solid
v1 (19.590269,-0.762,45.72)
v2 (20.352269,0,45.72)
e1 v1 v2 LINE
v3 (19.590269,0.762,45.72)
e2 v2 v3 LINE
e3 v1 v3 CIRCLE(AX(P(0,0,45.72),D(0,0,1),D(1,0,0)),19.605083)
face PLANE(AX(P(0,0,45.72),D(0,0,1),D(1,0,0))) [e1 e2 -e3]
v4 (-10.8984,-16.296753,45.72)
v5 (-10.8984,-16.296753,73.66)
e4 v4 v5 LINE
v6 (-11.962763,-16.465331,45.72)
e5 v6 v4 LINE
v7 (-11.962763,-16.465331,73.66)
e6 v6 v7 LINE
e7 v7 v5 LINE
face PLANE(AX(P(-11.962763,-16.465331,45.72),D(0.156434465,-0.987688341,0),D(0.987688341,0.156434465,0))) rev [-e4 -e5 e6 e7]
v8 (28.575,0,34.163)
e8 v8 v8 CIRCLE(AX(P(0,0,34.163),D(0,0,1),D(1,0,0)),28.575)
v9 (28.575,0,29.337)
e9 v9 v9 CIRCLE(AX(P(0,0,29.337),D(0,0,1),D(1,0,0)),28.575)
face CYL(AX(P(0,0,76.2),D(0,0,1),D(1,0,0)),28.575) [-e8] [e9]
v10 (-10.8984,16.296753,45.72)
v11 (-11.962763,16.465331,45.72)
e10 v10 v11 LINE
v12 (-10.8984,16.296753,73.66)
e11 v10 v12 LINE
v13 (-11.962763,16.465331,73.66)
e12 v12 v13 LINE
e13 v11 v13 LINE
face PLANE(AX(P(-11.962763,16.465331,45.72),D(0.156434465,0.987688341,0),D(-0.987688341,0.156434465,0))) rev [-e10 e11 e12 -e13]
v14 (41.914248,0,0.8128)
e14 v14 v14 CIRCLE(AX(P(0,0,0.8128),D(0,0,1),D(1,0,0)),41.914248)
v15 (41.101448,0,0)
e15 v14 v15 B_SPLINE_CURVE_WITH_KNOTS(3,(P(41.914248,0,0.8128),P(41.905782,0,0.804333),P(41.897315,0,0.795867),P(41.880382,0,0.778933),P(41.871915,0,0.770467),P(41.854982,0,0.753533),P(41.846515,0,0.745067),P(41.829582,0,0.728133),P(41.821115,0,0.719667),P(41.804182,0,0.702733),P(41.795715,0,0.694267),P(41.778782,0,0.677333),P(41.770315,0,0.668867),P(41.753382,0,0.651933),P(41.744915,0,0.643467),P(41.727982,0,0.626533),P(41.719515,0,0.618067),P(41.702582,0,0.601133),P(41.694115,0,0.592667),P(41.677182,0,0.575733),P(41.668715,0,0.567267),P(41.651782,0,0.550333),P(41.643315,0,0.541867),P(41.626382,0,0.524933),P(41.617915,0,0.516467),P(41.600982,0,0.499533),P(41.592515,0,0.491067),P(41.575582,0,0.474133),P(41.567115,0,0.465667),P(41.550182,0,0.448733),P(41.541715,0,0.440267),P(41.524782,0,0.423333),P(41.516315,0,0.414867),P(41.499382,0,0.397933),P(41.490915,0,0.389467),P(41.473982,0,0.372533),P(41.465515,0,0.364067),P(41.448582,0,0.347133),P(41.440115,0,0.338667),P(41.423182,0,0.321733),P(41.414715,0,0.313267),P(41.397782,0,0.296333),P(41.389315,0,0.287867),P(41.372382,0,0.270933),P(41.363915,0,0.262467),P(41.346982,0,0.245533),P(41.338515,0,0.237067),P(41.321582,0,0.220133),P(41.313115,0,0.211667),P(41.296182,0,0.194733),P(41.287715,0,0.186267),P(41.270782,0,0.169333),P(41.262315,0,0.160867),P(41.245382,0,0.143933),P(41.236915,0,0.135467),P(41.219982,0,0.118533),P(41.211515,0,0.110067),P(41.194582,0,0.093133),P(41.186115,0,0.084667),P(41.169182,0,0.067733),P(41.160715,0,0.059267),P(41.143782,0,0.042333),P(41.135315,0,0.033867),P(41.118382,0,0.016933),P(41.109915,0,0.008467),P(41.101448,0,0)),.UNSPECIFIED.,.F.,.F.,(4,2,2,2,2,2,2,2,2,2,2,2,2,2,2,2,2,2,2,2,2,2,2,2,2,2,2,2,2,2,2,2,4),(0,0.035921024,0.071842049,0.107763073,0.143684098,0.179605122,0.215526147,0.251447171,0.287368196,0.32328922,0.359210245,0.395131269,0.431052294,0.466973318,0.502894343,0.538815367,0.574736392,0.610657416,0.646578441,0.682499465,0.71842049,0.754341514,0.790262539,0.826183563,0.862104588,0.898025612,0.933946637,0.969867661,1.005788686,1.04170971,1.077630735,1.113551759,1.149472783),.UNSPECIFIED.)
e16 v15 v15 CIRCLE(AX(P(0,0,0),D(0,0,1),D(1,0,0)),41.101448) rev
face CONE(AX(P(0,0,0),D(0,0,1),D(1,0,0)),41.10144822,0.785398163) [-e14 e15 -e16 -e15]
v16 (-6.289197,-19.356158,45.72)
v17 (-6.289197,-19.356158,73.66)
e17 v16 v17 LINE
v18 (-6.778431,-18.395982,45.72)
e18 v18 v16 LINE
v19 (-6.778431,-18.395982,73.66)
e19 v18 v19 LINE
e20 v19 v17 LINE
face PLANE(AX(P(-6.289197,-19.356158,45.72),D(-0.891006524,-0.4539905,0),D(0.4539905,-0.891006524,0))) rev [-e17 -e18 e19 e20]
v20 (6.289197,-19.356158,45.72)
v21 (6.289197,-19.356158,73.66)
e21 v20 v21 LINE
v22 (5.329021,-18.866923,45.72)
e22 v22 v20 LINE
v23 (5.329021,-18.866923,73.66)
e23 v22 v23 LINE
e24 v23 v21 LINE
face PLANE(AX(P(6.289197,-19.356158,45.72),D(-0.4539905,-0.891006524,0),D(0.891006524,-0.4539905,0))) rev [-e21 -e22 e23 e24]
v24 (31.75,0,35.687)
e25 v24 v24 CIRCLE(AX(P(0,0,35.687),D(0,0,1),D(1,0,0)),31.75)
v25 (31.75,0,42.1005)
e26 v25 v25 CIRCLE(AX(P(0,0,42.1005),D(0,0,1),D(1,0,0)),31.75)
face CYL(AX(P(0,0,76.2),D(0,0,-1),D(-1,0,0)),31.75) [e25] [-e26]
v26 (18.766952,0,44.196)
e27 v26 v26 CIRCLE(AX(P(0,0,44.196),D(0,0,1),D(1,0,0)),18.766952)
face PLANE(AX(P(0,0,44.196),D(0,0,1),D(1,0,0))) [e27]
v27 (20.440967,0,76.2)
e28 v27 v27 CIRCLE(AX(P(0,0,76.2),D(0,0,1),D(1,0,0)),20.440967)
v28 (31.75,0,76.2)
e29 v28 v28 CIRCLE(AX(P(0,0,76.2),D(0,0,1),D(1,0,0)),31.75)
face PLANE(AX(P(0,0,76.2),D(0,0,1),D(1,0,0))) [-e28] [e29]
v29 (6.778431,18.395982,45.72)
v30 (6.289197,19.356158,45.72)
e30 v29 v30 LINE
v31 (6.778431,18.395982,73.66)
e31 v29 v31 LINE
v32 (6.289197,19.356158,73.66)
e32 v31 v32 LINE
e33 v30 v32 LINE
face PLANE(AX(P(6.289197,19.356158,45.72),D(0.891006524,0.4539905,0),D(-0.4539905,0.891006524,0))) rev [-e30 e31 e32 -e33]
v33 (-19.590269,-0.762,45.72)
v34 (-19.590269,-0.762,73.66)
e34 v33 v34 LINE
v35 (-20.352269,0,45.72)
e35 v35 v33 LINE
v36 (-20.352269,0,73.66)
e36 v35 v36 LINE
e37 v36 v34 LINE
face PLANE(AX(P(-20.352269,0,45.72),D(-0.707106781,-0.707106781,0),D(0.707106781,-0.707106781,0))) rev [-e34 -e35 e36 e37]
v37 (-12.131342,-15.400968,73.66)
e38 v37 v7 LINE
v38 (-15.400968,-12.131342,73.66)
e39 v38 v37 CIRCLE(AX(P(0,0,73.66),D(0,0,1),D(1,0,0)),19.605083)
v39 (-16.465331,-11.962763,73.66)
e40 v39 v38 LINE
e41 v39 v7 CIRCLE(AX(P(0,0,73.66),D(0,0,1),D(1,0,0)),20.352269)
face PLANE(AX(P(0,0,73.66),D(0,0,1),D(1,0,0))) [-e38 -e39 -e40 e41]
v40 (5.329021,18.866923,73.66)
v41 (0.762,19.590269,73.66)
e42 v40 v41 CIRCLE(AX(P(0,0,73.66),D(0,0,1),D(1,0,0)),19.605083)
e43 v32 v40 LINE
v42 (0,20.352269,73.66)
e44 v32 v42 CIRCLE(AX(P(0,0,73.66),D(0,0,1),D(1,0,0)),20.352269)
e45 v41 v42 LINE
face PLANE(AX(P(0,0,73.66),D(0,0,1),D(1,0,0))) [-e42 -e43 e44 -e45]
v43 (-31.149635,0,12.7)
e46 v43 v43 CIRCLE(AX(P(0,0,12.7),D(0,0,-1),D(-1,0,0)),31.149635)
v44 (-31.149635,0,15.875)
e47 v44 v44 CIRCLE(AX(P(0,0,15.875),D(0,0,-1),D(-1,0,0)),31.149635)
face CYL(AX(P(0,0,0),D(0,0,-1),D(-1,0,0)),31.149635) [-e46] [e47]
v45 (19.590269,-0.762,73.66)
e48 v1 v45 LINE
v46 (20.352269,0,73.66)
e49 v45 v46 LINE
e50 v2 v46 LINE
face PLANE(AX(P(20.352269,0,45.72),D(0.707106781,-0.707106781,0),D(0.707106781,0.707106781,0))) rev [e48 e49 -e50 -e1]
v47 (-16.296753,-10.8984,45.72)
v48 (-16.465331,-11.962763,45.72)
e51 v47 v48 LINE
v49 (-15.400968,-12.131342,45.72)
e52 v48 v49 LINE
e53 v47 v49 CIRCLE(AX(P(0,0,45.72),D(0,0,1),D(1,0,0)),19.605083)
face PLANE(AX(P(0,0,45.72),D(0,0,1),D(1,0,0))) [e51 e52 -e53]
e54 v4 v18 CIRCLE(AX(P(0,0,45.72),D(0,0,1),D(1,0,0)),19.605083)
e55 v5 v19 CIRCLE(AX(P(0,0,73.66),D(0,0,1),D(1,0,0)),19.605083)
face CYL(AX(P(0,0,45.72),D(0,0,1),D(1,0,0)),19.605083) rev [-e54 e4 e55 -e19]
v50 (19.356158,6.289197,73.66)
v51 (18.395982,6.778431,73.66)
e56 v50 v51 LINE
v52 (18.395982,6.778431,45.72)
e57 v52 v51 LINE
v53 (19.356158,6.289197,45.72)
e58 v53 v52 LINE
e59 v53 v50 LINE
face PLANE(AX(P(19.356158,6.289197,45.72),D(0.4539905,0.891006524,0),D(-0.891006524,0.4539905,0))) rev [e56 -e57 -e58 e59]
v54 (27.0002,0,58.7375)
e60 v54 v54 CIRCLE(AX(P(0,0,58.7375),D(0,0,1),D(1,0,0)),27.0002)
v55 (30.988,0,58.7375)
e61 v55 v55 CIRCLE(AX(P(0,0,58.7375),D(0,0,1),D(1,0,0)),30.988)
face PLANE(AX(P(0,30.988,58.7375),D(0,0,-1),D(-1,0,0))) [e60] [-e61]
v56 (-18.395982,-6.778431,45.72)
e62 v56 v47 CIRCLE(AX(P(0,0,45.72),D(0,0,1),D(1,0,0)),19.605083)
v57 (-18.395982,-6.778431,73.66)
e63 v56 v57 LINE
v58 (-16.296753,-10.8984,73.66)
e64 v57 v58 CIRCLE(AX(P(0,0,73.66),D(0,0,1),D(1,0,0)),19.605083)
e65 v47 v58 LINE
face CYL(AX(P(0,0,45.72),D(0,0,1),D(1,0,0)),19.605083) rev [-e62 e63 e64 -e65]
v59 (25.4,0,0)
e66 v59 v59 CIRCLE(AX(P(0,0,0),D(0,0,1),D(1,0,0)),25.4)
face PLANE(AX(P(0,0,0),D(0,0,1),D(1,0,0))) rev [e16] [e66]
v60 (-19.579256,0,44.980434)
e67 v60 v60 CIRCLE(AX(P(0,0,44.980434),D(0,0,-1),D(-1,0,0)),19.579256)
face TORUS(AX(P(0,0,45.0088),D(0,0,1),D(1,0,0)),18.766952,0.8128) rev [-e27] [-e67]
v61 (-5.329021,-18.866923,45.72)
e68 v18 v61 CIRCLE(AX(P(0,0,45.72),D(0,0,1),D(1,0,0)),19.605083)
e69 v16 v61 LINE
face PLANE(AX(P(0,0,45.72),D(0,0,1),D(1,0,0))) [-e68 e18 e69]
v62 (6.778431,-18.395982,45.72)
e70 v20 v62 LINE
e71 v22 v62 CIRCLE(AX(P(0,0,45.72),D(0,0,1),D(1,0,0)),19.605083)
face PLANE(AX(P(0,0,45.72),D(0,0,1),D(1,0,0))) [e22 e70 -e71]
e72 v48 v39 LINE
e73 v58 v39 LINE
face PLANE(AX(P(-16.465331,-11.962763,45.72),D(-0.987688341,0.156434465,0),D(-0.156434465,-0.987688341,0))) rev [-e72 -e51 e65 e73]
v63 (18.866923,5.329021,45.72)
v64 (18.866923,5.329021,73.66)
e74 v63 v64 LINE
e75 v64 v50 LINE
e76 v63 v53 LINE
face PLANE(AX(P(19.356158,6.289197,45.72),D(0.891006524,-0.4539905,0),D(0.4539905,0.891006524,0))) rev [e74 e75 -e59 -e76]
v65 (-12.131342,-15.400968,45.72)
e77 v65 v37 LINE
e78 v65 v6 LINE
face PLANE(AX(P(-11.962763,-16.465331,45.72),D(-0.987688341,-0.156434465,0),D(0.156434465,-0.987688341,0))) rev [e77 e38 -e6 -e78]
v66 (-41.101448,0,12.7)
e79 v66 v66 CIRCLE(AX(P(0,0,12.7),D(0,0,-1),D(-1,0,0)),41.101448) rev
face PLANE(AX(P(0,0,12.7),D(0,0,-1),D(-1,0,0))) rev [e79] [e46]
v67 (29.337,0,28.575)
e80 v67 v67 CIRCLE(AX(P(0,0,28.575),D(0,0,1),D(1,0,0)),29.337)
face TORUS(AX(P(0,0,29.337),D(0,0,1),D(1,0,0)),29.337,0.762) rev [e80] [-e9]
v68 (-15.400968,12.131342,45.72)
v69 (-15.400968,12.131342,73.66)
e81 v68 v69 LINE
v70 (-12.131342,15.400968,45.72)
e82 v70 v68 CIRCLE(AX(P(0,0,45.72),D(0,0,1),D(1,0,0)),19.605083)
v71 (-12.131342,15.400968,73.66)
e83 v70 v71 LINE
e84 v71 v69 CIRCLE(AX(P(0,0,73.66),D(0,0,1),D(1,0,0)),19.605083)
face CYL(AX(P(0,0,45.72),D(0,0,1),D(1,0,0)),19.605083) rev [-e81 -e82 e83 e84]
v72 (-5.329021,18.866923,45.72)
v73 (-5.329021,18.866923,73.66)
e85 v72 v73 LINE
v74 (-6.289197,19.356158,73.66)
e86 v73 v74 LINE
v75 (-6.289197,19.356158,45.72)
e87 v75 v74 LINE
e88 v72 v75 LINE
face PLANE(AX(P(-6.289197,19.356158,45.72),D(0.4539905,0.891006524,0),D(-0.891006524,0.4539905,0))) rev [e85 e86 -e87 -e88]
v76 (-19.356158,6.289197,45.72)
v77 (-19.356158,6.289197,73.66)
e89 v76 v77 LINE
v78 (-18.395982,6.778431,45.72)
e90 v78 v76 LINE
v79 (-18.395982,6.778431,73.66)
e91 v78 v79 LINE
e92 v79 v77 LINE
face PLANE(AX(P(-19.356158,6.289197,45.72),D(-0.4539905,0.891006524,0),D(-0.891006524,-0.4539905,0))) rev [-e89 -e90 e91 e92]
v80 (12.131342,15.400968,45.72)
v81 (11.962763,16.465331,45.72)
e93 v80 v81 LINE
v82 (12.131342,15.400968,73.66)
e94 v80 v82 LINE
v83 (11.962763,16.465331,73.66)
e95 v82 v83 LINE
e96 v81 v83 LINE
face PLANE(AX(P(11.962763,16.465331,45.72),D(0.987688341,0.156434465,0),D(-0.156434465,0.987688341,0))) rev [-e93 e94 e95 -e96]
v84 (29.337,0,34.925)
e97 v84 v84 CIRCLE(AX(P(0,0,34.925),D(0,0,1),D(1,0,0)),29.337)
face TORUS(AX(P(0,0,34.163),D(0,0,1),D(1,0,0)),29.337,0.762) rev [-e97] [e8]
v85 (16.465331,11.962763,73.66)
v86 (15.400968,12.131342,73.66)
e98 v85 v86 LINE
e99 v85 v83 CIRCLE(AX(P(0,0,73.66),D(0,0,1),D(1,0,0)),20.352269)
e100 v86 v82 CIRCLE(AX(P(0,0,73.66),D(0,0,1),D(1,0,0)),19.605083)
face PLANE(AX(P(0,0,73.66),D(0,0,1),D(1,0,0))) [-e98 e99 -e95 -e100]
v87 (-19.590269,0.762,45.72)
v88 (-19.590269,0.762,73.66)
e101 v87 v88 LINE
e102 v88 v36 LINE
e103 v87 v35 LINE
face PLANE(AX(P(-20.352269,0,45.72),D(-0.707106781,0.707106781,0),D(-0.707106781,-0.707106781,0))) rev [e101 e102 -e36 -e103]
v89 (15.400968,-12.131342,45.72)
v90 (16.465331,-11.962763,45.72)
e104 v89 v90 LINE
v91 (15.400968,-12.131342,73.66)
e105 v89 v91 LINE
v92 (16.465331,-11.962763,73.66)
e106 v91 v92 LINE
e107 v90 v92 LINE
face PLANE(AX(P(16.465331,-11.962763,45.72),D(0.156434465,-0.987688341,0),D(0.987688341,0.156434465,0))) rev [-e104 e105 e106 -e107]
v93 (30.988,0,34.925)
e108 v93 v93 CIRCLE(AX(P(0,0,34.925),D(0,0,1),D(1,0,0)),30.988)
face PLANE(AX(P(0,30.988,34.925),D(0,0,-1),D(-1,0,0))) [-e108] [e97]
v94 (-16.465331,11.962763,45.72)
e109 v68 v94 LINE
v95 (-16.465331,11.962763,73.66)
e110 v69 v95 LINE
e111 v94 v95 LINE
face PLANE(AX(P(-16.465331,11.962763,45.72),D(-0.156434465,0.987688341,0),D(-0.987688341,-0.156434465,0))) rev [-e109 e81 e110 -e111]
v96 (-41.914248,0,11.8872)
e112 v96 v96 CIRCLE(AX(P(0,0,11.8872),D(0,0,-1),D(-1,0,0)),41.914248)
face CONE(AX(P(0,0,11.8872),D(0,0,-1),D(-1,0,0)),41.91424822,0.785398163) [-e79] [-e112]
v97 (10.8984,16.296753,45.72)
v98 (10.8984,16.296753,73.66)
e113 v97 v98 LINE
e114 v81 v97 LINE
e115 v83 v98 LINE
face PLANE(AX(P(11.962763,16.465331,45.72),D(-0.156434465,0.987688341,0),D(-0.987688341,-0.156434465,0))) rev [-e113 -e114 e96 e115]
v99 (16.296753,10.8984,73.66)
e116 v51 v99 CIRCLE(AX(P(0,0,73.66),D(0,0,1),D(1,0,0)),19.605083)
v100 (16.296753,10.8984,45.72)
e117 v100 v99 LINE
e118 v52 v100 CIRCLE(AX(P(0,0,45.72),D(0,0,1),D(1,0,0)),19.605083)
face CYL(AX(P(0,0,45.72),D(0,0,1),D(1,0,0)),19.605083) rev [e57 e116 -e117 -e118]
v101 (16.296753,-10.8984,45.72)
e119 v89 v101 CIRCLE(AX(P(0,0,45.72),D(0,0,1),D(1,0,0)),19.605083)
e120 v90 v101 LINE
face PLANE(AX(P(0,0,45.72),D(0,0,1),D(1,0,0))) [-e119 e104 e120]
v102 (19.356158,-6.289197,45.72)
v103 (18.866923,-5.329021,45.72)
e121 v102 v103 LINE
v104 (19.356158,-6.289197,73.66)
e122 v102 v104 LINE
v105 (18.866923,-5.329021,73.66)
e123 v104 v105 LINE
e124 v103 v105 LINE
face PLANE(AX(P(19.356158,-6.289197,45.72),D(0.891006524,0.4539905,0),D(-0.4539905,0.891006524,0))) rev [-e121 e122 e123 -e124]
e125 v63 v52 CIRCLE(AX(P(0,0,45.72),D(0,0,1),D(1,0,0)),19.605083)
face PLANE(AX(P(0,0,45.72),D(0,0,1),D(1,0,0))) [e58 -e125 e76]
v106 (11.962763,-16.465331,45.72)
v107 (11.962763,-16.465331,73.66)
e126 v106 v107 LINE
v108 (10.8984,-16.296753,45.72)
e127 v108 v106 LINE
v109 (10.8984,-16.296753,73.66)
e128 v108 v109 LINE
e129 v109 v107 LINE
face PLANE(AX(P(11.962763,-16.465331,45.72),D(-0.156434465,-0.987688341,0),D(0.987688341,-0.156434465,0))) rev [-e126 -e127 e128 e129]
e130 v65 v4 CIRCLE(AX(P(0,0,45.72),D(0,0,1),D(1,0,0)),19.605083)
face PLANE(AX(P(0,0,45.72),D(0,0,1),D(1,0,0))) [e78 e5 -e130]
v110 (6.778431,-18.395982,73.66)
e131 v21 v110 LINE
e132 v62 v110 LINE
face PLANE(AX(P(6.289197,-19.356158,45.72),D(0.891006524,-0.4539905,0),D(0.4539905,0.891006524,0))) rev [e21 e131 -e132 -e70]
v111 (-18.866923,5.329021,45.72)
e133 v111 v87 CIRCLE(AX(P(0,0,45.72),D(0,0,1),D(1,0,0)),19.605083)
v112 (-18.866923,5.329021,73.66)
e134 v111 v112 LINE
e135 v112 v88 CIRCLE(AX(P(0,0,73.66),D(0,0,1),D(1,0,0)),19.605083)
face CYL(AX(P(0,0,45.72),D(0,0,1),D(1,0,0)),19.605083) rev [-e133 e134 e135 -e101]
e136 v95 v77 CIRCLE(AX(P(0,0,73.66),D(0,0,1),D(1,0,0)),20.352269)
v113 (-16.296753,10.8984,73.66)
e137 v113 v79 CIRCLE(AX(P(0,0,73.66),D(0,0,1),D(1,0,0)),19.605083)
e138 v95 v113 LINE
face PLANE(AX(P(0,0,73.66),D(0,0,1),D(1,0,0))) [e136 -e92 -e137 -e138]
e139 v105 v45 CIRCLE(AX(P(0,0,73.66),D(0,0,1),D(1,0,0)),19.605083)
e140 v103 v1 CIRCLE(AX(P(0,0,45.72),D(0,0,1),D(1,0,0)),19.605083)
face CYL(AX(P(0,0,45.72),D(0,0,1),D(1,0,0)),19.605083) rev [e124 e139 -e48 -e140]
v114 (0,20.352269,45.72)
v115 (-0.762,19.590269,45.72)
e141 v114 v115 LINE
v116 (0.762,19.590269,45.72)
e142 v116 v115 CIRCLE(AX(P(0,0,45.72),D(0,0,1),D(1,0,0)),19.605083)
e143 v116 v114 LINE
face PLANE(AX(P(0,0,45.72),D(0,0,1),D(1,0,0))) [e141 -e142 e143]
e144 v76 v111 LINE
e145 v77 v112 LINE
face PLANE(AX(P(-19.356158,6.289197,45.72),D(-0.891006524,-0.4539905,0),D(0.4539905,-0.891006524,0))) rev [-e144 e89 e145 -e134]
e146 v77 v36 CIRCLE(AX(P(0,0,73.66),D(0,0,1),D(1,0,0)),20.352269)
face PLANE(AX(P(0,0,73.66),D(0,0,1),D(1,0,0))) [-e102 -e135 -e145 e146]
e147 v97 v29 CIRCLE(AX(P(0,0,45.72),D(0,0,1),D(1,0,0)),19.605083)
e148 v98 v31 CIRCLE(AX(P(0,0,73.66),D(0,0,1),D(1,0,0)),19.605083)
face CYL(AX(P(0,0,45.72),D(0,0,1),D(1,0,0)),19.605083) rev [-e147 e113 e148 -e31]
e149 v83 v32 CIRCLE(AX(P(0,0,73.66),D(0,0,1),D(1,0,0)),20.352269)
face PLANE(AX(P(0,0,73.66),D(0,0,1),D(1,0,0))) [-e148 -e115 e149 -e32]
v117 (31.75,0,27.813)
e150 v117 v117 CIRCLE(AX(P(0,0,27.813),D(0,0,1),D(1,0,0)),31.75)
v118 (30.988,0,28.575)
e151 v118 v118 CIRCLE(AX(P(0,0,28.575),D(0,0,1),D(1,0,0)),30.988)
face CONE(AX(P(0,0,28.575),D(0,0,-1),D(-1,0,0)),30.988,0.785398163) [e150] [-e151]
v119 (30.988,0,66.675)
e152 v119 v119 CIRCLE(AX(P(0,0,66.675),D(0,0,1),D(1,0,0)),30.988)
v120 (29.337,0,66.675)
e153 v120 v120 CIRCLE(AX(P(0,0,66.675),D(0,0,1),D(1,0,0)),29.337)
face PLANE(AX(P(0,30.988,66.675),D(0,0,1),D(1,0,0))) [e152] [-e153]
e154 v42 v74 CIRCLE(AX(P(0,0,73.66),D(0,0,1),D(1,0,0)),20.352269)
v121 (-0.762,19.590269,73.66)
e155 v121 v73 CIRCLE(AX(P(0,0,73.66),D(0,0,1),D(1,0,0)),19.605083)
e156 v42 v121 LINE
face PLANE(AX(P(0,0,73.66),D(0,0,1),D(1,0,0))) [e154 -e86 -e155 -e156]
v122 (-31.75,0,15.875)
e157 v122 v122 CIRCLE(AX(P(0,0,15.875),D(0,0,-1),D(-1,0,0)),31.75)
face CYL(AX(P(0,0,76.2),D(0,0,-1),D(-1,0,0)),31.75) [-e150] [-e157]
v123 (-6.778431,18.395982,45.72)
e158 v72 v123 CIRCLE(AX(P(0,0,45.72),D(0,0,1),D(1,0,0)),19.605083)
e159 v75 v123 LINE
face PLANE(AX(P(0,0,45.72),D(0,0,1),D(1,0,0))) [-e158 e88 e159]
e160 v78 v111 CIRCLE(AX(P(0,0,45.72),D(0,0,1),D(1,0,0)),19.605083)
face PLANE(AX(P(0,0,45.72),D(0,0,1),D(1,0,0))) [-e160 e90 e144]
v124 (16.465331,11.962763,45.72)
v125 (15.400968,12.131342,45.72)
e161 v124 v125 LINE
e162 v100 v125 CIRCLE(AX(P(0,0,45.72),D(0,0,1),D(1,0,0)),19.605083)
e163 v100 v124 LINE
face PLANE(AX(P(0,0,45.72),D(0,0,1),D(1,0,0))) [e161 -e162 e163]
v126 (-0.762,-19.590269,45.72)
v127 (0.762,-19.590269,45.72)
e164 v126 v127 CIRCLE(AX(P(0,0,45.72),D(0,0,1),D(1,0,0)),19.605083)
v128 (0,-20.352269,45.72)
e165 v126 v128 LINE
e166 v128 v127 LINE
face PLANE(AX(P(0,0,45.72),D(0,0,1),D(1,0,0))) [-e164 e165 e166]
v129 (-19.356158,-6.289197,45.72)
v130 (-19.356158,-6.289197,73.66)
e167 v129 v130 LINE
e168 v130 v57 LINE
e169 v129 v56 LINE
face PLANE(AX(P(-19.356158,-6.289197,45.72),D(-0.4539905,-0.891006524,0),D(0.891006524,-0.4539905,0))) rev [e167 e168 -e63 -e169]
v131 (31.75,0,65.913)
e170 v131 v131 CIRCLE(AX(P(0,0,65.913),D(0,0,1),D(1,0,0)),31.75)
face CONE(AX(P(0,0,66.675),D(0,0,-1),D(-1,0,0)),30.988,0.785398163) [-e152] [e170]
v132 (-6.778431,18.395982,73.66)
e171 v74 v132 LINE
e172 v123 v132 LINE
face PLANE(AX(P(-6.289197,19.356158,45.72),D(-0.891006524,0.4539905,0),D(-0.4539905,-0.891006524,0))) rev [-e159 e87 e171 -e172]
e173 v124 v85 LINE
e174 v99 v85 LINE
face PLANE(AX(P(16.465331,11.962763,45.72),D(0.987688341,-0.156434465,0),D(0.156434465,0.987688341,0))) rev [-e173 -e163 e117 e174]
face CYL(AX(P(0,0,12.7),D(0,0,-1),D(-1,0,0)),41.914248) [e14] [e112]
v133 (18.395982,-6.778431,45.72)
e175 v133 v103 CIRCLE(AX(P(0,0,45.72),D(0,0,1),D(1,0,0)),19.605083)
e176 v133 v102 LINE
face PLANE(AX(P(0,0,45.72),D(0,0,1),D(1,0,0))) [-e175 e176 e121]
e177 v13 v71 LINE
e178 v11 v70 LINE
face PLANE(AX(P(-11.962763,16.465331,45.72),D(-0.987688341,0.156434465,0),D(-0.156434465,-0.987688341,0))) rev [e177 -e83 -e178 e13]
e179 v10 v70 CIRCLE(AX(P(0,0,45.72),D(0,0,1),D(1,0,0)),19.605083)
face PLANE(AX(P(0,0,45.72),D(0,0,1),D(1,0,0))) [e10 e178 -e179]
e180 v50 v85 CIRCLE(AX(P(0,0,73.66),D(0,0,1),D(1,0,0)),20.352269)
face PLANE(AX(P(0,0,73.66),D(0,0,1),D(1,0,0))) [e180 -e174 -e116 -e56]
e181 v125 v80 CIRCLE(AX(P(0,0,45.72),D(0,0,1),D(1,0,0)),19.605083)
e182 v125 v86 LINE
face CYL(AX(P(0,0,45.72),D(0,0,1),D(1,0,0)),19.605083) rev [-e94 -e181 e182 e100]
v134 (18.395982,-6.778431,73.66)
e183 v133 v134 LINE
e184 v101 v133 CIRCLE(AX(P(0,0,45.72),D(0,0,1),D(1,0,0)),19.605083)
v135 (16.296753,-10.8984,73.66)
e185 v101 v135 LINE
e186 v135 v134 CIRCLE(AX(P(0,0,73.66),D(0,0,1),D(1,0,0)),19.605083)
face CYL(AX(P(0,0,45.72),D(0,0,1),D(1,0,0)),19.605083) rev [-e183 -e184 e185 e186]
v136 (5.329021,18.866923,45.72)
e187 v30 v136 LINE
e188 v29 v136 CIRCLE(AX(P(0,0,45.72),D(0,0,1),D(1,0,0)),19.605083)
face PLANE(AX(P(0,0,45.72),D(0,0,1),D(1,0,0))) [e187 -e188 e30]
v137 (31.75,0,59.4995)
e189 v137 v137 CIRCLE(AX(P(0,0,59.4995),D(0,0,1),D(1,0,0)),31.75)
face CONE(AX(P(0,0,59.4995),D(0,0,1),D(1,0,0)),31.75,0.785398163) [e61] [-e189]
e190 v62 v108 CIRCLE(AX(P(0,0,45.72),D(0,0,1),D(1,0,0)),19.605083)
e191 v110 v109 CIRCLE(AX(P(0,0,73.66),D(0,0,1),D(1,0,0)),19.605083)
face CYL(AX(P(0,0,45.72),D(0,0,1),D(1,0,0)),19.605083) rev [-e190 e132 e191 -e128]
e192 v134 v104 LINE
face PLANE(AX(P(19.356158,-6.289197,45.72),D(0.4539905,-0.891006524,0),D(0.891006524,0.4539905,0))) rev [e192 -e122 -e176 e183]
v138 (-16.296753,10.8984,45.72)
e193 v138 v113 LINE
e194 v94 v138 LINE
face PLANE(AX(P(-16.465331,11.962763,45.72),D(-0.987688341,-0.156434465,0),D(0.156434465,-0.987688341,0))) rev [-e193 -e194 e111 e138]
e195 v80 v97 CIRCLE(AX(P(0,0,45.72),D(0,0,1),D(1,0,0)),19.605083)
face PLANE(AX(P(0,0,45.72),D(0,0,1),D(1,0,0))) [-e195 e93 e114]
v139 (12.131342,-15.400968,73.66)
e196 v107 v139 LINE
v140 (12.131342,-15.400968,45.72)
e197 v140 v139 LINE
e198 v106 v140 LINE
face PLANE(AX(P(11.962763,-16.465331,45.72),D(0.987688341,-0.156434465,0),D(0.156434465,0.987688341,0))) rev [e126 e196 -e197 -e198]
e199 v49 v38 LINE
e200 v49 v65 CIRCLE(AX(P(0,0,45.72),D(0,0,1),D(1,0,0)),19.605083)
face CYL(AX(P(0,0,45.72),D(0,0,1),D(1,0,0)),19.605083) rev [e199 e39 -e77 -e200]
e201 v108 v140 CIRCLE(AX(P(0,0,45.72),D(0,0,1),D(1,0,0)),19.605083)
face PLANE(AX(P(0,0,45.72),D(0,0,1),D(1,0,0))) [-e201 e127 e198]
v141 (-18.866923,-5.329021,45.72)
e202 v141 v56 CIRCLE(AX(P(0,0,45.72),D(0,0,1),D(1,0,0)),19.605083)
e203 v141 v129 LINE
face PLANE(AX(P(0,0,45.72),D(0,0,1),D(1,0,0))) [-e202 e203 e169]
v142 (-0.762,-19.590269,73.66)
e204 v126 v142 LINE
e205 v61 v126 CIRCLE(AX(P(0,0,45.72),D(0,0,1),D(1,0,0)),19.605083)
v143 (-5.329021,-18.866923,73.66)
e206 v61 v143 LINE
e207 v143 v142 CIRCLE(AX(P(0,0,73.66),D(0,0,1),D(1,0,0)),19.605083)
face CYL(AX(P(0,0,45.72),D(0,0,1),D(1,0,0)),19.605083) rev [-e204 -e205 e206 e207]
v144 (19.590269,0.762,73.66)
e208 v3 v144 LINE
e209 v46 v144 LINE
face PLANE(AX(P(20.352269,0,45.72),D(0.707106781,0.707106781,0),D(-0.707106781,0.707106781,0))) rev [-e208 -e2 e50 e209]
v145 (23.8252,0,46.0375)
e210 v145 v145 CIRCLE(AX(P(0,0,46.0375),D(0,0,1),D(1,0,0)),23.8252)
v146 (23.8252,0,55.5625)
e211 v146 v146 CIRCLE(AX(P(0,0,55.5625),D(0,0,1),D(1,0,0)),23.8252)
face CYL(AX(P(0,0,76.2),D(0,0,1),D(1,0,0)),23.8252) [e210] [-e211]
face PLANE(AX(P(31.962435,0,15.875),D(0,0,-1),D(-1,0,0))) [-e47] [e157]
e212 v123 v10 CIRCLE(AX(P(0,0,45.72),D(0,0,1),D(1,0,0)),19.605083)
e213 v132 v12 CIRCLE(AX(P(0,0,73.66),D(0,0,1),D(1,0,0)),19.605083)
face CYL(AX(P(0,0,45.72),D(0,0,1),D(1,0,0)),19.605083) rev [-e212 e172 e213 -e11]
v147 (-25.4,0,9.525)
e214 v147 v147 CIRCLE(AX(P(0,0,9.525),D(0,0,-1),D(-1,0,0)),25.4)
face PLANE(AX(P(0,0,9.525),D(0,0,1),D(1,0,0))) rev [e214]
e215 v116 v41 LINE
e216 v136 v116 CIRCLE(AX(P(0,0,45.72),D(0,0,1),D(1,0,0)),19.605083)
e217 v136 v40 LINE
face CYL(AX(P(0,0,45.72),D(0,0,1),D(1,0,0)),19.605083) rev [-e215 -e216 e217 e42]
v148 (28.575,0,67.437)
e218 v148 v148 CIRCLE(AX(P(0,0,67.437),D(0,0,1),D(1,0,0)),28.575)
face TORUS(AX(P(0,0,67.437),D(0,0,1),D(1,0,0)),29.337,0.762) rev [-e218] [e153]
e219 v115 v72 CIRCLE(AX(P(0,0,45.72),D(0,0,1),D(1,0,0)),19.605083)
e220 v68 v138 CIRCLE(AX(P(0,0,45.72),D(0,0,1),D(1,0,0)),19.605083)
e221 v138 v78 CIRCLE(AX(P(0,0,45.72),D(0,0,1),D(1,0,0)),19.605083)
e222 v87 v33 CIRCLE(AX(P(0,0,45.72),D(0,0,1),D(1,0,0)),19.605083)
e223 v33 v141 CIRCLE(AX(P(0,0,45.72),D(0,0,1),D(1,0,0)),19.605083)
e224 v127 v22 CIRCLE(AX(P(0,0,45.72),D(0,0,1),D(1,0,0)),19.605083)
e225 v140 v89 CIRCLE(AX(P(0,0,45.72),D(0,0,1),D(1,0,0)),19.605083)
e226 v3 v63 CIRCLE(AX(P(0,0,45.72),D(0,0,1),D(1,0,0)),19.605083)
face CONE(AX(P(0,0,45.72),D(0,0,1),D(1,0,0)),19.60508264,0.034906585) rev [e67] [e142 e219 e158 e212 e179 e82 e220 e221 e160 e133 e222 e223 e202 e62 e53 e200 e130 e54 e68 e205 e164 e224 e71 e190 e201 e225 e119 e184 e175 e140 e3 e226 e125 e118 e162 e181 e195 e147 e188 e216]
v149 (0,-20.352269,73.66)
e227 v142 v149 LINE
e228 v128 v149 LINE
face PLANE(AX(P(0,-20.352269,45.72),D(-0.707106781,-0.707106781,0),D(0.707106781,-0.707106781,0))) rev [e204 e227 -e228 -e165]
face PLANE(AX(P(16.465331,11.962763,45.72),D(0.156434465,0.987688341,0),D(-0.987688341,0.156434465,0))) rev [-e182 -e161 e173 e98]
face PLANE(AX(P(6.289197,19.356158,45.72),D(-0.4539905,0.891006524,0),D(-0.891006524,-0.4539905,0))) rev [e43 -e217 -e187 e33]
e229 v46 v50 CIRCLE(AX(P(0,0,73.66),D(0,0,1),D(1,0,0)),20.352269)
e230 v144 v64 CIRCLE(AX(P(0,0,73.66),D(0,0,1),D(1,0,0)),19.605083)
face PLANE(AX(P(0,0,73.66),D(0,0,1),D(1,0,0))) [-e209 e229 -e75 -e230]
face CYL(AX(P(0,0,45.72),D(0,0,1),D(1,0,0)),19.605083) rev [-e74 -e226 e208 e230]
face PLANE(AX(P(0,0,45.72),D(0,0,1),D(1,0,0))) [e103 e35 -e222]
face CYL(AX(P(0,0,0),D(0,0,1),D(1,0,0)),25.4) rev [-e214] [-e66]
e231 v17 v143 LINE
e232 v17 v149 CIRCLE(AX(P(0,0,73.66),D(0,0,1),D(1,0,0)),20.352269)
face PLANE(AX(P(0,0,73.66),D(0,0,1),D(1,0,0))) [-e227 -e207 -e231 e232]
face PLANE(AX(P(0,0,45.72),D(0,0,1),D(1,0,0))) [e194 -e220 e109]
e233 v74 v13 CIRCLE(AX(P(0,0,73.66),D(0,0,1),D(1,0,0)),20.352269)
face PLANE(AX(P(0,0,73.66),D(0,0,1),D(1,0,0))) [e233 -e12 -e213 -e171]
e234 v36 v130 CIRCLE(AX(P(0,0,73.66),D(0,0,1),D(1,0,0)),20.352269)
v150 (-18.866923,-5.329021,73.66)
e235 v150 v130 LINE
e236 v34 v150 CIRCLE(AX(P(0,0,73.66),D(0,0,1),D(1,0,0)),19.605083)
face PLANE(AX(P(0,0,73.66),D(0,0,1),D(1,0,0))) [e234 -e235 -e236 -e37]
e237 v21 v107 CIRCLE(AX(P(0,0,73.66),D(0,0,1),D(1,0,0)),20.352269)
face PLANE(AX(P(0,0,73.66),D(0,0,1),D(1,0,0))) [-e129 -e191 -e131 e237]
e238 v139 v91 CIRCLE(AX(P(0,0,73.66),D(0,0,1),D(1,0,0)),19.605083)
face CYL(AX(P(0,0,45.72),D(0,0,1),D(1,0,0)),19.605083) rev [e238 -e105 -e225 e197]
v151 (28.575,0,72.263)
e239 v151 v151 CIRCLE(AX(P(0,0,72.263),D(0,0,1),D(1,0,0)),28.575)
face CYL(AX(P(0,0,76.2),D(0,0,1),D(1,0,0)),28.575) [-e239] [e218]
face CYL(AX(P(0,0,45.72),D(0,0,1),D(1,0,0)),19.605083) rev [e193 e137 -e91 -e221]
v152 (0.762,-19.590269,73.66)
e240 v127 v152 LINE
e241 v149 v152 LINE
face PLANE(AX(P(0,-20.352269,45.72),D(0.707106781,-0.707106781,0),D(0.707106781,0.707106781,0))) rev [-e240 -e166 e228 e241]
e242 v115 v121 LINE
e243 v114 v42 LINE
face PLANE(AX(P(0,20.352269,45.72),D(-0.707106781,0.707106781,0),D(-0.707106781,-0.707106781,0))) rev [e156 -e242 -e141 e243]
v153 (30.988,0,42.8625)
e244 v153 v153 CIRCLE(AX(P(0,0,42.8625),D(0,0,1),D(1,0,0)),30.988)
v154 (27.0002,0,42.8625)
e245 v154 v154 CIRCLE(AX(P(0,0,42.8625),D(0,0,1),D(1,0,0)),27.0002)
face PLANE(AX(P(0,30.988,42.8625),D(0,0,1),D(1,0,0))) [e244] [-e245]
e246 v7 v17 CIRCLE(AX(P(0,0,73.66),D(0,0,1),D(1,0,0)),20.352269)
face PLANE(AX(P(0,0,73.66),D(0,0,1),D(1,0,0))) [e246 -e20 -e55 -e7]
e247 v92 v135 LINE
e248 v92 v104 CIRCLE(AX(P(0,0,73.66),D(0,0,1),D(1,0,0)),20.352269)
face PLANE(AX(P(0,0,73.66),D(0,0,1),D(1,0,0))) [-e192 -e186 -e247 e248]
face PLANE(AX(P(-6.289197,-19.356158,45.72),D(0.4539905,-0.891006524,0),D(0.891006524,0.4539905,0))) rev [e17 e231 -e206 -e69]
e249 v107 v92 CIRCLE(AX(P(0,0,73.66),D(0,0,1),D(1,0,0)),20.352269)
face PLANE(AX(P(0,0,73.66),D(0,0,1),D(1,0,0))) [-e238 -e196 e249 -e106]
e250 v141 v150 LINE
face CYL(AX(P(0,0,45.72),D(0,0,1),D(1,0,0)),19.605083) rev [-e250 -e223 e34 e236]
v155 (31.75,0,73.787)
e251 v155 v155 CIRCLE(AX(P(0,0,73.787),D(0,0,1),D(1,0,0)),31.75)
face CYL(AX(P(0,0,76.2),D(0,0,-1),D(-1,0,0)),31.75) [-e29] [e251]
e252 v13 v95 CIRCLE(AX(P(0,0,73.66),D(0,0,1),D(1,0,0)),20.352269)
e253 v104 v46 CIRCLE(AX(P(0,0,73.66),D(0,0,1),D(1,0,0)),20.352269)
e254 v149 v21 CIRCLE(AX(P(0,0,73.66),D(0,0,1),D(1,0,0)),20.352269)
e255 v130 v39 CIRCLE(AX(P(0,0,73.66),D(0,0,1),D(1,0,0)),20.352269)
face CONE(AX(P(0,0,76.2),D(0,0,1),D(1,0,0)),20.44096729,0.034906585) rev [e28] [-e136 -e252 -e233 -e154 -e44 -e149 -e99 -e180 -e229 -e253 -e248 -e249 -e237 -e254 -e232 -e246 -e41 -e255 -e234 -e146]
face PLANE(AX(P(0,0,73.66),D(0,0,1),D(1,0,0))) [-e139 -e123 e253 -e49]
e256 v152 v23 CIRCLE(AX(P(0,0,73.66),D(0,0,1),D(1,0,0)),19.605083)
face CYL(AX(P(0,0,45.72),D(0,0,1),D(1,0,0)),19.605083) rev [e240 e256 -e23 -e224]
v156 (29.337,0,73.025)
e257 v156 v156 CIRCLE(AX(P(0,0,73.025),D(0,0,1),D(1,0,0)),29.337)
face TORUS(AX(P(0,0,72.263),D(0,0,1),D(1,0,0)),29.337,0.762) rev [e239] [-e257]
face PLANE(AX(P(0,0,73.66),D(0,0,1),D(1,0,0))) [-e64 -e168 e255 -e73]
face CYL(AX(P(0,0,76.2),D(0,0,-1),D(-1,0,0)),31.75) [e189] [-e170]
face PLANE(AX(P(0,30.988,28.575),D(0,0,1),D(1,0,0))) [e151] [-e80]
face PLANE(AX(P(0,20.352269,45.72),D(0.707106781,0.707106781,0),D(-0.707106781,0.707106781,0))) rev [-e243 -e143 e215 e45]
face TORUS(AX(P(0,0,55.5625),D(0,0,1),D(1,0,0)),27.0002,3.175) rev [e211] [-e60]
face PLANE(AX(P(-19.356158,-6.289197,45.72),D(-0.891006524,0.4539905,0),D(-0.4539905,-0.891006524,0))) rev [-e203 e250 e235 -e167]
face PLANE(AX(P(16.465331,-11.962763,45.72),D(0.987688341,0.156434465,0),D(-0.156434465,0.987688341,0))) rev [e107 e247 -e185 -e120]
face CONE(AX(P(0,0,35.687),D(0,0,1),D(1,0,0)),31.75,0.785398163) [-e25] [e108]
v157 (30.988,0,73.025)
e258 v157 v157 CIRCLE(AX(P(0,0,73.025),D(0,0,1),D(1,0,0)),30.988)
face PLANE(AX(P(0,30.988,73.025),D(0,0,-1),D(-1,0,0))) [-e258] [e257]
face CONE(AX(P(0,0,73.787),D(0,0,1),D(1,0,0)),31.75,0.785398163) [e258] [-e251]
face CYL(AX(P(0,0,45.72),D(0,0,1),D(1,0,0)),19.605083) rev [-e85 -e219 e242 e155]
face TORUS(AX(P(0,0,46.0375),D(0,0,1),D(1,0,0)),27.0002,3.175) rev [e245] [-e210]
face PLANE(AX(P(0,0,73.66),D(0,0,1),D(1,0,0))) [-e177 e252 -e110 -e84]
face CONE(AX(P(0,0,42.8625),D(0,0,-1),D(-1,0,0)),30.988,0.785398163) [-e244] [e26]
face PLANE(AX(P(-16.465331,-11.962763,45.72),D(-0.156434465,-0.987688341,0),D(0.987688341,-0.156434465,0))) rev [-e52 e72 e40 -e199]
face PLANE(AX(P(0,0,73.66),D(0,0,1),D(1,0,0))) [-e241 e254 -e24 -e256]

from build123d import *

# Parameters (mm, degrees)
SKETCH1_R              = 31.75
EXTRUDE1_DEPTH         = 76.2
SKETCH3_R              = 20.44096729
CUT_EXTRUDE1_DEPTH     = 2.54
CUT_EXTRUDE1_DRAFT     = -2
CUT_EXTRUDE2_DEPTH     = 27.94
CIRPATTERN1_COUNT      = 20
SKETCH5_R              = 19.60508264
CUT_EXTRUDE3_DEPTH     = 1.524
CUT_EXTRUDE3_DRAFT     = -2
FILLET1_R              = 0.8128
SKETCH7_R              = 41.91424822
EXTRUDE2_DEPTH         = 12.7
CHAMFER1_SIZE          = 0.8128
SKETCH8_W              = 0.8128
SKETCH8_H              = 3.175
COUNTERBORE1_OUTLINE_R = 25.4
COUNTERBORE1_DEPTH     = 9.525


# Read off the part's stored shape, not the designer's step: CounterBore1
with BuildPart() as part:
    # Sketch1 → Extrude1 (new body)
    with BuildSketch(Plane.XY):
        Circle(SKETCH1_R)
    extrude(amount=EXTRUDE1_DEPTH)


with BuildPart() as cut_extrude1_tool:
    # Sketch3 → Cut-Extrude1 (with draft: the straight prism first)
    with BuildSketch(Plane.XY.offset(76.2)):
        Circle(SKETCH3_R)
    extrude(amount=-CUT_EXTRUDE1_DEPTH)
    # Cut-Extrude1: the draft: its side faces are tilted about the plane it starts from
    cut_extrude1_sides = [cut_extrude1_tool.faces().sort_by_distance(p)[0] for p in [
        (-20.44096729, 0, 74.93),
    ]]
    draft(cut_extrude1_sides, Plane.XY.offset(76.2), CUT_EXTRUDE1_DRAFT)


with BuildPart() as part_1:
    add(part.part)

    # Cut-Extrude1: cut by cut_extrude1_tool
    add(cut_extrude1_tool.part, mode=Mode.SUBTRACT)

    # Sketch4 → Cut-Extrude2 (cut)
    with BuildSketch(Plane.XY.offset(73.66)):
        with BuildLine():
            Line((20.352268536, 0), (19.590268536, 0.762))
            ThreePointArc((19.590268536, 0.762), (-19.60508264, 0), (19.590268536, -0.762))
            Line((19.590268536, -0.762), (20.352268536, 0))
        make_face()
    cut_extrude2 = extrude(amount=-CUT_EXTRUDE2_DEPTH, mode=Mode.SUBTRACT)

    # CirPattern1: Cut-Extrude2 ×20 about axis
    cirpattern1_axis = Axis((0, 0, 0), (0, 0, 1))
    for i in range(1, CIRPATTERN1_COUNT):
        add(cut_extrude2.rotate(cirpattern1_axis, i * 360 / CIRPATTERN1_COUNT), mode=Mode.SUBTRACT)


with BuildPart() as cut_extrude3_tool:
    # Sketch5 → Cut-Extrude3 (with draft: the straight prism first)
    with BuildSketch(Plane.XY.offset(45.72)):
        Circle(SKETCH5_R)
    extrude(amount=-CUT_EXTRUDE3_DEPTH)
    # Cut-Extrude3: the draft: its side faces are tilted about the plane it starts from
    cut_extrude3_sides = [cut_extrude3_tool.faces().sort_by_distance(p)[0] for p in [
        (-19.60508264, 0, 44.958),
    ]]
    draft(cut_extrude3_sides, Plane.XY.offset(45.72), CUT_EXTRUDE3_DRAFT)


with BuildPart() as part_2:
    add(part_1.part)

    # Cut-Extrude3: cut by cut_extrude3_tool
    add(cut_extrude3_tool.part, mode=Mode.SUBTRACT)

    # Fillet1
    fillet1_edges = [part_2.edges().sort_by_distance(p)[0] for p in [
        (-19.551863387, 0, 44.196),
    ]]
    fillet(fillet1_edges, radius=FILLET1_R)

    # Sketch6 → Cut-Revolve1 (revolve, cut)
    with BuildSketch(Plane(origin=(0, 0, 0), x_dir=(0, 0, -1), z_dir=(1, 0, 0)), mode=Mode.PRIVATE) as cut_revolve1_sk:
        with BuildLine():
            Line((-65.913, 31.75), (-59.4995, 31.75))
            Line((-59.4995, 31.75), (-58.7375, 30.988))
            Line((-58.7375, 30.988), (-58.7375, 27.0002))
            ThreePointArc((-58.7375, 27.0002), (-57.80756403, 24.75513597), (-55.5625, 23.8252))
            Line((-55.5625, 23.8252), (-46.0375, 23.8252))
            ThreePointArc((-46.0375, 23.8252), (-43.79243597, 24.75513597), (-42.8625, 27.0002))
            Line((-42.8625, 27.0002), (-42.8625, 30.988))
            Line((-42.8625, 30.988), (-42.1005, 31.75))
            Line((-42.1005, 31.75), (-35.687, 31.75))
            Line((-35.687, 31.75), (-34.925, 30.988))
            Line((-34.925, 30.988), (-34.925, 29.337))
            ThreePointArc((-34.925, 29.337), (-34.701815367, 28.798184633), (-34.163, 28.575))
            Line((-34.163, 28.575), (-29.337, 28.575))
            ThreePointArc((-29.337, 28.575), (-28.798184633, 28.798184633), (-28.575, 29.337))
            Line((-28.575, 29.337), (-28.575, 30.988))
            Line((-28.575, 30.988), (-27.813, 31.75))
            Line((-27.813, 31.75), (-24.638309625, 31.75))
            Line((-24.638309625, 31.75), (-24.638309625, 40.707707425))
            Line((-24.638309625, 40.707707425), (-76.2, 40.707707425))
            Line((-76.2, 40.707707425), (-76.2, 31.75))
            Line((-76.2, 31.75), (-73.787, 31.75))
            Line((-73.787, 31.75), (-73.025, 30.988))
            Line((-73.025, 30.988), (-73.025, 29.337))
            ThreePointArc((-73.025, 29.337), (-72.801815367, 28.798184633), (-72.263, 28.575))
            Line((-72.263, 28.575), (-67.437, 28.575))
            ThreePointArc((-67.437, 28.575), (-66.898184633, 28.798184633), (-66.675, 29.337))
            Line((-66.675, 29.337), (-66.675, 30.988))
            Line((-66.675, 30.988), (-65.913, 31.75))
        make_face()
    revolve(cut_revolve1_sk.sketch.rotate(Axis((0, 0, 76.2), (0, 0, -1)), 90), axis=Axis((0, 0, 76.2), (0, 0, -1)), mode=Mode.SUBTRACT)

    # Sketch7 → Extrude2 (add)
    with BuildSketch(Plane(origin=(0, 0, 0), x_dir=(-1, 0, 0), z_dir=(0, 0, -1))):
        Circle(SKETCH7_R)
    extrude(amount=-EXTRUDE2_DEPTH)

    # Chamfer1
    chamfer1_edges = [part_2.edges().sort_by_distance(p)[0] for p in [
        (41.91424822, 0, 0),
        (41.91424822, 0, 12.7),
    ]]
    chamfer(chamfer1_edges, length=CHAMFER1_SIZE)

    # Sketch8 → Cut-Revolve2 (revolve, cut)
    with BuildSketch(Plane(origin=(0, 0, 0), x_dir=(1, 0, 0), z_dir=(0, 1, 0)), mode=Mode.PRIVATE) as cut_revolve2_sk:
        with Locations((31.556035197, -14.2875)):
            Rectangle(SKETCH8_W, SKETCH8_H)
    revolve(cut_revolve2_sk.sketch.rotate(Axis((0, 0, 0), (0, 0, 1)), 180), axis=Axis((0, 0, 0), (0, 0, 1)), mode=Mode.SUBTRACT)

    # CounterBore1 outline → CounterBore1 (cut)
    with BuildSketch(Plane.XY):
        Circle(COUNTERBORE1_OUTLINE_R)
    extrude(amount=COUNTERBORE1_DEPTH, mode=Mode.SUBTRACT)


solid = part_2.part
